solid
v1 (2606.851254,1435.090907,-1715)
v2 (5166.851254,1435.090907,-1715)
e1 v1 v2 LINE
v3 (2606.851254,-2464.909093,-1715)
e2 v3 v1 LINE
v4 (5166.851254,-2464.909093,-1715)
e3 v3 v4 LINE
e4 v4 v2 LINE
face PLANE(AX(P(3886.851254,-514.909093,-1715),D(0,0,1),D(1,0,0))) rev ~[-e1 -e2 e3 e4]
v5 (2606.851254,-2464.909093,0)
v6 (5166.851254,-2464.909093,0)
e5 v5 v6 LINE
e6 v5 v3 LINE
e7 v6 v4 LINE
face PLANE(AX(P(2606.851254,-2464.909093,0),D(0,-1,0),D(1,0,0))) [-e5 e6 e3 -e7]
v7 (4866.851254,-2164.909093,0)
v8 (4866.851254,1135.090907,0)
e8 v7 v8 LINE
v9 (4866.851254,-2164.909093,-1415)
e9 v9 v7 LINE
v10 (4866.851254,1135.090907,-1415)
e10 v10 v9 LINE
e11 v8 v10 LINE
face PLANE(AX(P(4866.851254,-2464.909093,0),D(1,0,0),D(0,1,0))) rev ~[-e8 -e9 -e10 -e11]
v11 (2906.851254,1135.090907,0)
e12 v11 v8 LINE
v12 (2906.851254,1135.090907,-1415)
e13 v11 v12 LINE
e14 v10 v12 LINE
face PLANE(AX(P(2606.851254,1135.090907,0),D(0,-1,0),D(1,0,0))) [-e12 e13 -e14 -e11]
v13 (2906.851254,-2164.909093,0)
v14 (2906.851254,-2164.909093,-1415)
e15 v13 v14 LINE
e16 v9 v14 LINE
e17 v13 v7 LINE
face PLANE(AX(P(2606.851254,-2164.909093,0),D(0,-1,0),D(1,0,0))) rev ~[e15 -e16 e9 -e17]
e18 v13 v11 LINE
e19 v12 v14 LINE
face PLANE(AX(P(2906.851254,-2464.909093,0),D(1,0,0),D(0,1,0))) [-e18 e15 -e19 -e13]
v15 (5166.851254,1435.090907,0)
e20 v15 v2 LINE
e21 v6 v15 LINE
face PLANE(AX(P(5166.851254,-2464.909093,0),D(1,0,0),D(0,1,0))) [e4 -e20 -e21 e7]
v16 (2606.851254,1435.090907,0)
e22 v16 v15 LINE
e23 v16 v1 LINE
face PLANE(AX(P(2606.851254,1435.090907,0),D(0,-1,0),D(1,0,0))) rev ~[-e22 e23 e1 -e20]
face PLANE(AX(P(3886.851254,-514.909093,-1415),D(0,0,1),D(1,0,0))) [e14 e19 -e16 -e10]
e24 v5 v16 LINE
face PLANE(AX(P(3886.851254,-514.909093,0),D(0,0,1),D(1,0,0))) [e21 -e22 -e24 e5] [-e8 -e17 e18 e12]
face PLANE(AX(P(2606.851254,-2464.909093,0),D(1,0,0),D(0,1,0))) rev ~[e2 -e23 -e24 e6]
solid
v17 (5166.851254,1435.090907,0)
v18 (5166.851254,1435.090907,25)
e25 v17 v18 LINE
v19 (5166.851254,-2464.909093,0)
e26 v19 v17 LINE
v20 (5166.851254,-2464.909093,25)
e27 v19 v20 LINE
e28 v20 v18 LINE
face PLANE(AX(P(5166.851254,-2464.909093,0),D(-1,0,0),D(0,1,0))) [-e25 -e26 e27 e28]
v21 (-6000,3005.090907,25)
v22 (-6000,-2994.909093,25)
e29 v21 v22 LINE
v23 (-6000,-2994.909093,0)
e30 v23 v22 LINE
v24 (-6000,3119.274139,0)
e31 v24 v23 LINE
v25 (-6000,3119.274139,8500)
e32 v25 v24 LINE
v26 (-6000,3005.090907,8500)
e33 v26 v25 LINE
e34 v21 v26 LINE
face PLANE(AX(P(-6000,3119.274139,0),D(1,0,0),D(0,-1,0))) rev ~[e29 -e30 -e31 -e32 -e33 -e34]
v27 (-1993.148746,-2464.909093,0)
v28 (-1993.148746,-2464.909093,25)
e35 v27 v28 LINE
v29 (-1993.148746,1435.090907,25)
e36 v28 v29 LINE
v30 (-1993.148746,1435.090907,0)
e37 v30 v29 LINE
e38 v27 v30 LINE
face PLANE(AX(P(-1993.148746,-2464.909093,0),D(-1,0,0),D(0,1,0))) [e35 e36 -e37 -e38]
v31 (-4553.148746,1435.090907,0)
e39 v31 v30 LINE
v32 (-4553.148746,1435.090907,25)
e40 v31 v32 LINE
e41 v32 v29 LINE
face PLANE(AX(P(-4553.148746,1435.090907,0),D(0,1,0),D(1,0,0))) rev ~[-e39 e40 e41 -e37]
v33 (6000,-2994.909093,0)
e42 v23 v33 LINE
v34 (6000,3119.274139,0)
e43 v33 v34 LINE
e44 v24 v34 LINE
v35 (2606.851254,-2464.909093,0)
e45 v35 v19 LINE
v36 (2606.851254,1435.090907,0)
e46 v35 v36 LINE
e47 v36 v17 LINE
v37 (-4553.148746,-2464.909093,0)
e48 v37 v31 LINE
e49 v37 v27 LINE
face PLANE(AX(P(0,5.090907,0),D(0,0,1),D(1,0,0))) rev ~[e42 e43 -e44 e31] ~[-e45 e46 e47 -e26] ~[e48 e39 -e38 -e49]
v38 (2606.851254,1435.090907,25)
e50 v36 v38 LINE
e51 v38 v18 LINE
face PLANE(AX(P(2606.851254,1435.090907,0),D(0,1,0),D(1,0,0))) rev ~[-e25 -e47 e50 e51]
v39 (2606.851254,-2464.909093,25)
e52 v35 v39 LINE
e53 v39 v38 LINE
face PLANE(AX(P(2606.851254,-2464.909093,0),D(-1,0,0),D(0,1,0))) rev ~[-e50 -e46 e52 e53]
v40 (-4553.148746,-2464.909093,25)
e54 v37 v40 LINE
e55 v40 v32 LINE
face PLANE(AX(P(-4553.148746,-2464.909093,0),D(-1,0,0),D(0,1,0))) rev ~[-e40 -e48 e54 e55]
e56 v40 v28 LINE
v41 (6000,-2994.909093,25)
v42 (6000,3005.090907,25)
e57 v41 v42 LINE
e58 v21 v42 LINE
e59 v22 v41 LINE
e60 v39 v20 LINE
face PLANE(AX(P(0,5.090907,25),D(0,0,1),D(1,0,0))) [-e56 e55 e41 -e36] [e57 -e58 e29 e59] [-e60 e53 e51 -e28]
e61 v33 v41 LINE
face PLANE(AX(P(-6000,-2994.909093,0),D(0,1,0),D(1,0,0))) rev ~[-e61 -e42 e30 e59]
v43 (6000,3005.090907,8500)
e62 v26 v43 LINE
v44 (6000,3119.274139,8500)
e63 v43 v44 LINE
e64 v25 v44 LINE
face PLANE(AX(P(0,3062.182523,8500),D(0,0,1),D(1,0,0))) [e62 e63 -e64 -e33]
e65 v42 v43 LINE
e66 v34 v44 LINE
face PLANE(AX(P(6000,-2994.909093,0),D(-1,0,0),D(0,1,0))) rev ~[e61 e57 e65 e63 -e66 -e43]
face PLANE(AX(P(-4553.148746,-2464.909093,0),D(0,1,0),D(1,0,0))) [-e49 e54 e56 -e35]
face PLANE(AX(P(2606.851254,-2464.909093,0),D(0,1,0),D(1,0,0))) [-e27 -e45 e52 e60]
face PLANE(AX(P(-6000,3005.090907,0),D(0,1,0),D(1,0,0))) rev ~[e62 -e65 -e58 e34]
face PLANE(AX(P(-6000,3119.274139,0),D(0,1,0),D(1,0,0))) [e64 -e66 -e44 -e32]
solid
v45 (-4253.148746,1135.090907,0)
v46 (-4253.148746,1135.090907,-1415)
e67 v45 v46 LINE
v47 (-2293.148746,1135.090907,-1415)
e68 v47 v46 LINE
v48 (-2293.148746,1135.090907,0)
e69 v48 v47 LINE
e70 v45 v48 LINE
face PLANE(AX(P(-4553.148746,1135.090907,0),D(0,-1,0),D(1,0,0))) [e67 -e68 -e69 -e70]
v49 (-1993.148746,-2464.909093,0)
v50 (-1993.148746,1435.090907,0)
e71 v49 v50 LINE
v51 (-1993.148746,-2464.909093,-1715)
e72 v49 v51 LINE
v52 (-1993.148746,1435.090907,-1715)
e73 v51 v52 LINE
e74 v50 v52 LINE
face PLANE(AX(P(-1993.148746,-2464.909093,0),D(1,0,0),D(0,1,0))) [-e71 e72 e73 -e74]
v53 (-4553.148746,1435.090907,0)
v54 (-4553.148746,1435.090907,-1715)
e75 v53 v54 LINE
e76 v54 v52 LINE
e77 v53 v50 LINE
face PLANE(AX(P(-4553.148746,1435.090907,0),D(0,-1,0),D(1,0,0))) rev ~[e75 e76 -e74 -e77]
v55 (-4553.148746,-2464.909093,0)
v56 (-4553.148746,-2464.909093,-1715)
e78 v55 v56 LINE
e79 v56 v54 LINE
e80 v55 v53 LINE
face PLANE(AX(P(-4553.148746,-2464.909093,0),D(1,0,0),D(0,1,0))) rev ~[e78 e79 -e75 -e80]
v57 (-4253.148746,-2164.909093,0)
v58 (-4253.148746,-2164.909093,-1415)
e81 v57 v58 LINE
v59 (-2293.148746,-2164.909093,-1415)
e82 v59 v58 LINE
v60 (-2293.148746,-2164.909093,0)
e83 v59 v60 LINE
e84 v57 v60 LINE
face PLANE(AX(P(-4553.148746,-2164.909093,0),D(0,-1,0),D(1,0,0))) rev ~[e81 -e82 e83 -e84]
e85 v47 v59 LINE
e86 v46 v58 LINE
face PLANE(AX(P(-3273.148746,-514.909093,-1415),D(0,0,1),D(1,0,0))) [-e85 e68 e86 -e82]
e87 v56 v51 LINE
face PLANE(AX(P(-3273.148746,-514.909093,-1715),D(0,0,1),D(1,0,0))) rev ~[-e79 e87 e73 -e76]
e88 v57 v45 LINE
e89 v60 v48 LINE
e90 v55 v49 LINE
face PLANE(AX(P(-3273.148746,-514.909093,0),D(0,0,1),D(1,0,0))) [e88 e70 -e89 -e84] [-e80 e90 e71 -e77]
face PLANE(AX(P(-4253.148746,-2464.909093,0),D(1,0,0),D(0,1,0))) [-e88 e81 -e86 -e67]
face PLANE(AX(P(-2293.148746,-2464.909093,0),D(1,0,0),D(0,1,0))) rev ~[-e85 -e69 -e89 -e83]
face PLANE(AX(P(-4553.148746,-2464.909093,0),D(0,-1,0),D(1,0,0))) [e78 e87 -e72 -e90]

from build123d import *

# Parameters (mm, degrees)
F0_W     = 12000
F0_H     = 114.1832326539
F1_DEPTH = 8500
F0_H_2   = 6000
F0_W_2   = 2560
F0_H_3   = 3900
F2_DEPTH = 25
F0_W_3   = 1960
F0_H_4   = 3300
F3_DEPTH = 1715
F4_T     = -300
F4_2_T   = -300


with BuildPart() as f1:
    # F0 (on Top) → F1 (new body)
    with BuildSketch(Plane.XY):
        with Locations((0, 3062.1825230774)):
            Rectangle(F0_W, F0_H)
    extrude(amount=F1_DEPTH)

    # F0 (on Top) → F2 (join)
    with BuildSketch(Plane.XY):
        with Locations((0, 5.0909067504)):
            Rectangle(F0_W, F0_H_2)
        with Locations((-3273.1487464905, -514.9090932496)):
            Rectangle(F0_W_2, F0_H_3, mode=Mode.SUBTRACT)
        with Locations((3886.8512535095, -514.9090932496)):
            Rectangle(F0_W_2, F0_H_3, mode=Mode.SUBTRACT)
        with Locations((0, 3062.1825230774)):
            Rectangle(F0_W, F0_H)
    extrude(amount=F2_DEPTH)


with BuildPart() as f3:
    # F0 (on Top) → F3 (new body)
    with BuildSketch(Plane.XY):
        with Locations((-3273.1487464905, -514.9090932496)):
            Rectangle(F0_W_2, F0_H_3)
        with Locations((-3273.1487464905, -514.9090932496)):
            Rectangle(F0_W_3, F0_H_4, mode=Mode.SUBTRACT)
        with Locations((-3273.1487464905, -514.9090932496)):
            Rectangle(F0_W_3, F0_H_4)
    extrude(amount=-F3_DEPTH)

    # F4
    f4_openings = [f3.faces().sort_by_distance(p)[0] for p in [
        (-3273.148746, -514.909093, 0),
    ]]
    offset(amount=F4_T, openings=f4_openings)


with BuildPart() as f3b:
    # F0 (on Top) → F3, piece 2 (new body)
    with BuildSketch(Plane.XY):
        with Locations((3886.8512535095, -514.9090932496)):
            Rectangle(F0_W_2, F0_H_3)
        with Locations((3886.8512535095, -514.9090932496)):
            Rectangle(F0_W_3, F0_H_4, mode=Mode.SUBTRACT)
        with Locations((3886.8512535095, -514.9090932496)):
            Rectangle(F0_W_3, F0_H_4)
    extrude(amount=-F3_DEPTH)

    # F4#2
    f4_2_openings = [f3b.faces().sort_by_distance(p)[0] for p in [
        (3886.851254, -514.909093, 0),
    ]]
    offset(amount=F4_2_T, openings=f4_2_openings)


solid = Compound([f1.part, f3.part, f3b.part])
